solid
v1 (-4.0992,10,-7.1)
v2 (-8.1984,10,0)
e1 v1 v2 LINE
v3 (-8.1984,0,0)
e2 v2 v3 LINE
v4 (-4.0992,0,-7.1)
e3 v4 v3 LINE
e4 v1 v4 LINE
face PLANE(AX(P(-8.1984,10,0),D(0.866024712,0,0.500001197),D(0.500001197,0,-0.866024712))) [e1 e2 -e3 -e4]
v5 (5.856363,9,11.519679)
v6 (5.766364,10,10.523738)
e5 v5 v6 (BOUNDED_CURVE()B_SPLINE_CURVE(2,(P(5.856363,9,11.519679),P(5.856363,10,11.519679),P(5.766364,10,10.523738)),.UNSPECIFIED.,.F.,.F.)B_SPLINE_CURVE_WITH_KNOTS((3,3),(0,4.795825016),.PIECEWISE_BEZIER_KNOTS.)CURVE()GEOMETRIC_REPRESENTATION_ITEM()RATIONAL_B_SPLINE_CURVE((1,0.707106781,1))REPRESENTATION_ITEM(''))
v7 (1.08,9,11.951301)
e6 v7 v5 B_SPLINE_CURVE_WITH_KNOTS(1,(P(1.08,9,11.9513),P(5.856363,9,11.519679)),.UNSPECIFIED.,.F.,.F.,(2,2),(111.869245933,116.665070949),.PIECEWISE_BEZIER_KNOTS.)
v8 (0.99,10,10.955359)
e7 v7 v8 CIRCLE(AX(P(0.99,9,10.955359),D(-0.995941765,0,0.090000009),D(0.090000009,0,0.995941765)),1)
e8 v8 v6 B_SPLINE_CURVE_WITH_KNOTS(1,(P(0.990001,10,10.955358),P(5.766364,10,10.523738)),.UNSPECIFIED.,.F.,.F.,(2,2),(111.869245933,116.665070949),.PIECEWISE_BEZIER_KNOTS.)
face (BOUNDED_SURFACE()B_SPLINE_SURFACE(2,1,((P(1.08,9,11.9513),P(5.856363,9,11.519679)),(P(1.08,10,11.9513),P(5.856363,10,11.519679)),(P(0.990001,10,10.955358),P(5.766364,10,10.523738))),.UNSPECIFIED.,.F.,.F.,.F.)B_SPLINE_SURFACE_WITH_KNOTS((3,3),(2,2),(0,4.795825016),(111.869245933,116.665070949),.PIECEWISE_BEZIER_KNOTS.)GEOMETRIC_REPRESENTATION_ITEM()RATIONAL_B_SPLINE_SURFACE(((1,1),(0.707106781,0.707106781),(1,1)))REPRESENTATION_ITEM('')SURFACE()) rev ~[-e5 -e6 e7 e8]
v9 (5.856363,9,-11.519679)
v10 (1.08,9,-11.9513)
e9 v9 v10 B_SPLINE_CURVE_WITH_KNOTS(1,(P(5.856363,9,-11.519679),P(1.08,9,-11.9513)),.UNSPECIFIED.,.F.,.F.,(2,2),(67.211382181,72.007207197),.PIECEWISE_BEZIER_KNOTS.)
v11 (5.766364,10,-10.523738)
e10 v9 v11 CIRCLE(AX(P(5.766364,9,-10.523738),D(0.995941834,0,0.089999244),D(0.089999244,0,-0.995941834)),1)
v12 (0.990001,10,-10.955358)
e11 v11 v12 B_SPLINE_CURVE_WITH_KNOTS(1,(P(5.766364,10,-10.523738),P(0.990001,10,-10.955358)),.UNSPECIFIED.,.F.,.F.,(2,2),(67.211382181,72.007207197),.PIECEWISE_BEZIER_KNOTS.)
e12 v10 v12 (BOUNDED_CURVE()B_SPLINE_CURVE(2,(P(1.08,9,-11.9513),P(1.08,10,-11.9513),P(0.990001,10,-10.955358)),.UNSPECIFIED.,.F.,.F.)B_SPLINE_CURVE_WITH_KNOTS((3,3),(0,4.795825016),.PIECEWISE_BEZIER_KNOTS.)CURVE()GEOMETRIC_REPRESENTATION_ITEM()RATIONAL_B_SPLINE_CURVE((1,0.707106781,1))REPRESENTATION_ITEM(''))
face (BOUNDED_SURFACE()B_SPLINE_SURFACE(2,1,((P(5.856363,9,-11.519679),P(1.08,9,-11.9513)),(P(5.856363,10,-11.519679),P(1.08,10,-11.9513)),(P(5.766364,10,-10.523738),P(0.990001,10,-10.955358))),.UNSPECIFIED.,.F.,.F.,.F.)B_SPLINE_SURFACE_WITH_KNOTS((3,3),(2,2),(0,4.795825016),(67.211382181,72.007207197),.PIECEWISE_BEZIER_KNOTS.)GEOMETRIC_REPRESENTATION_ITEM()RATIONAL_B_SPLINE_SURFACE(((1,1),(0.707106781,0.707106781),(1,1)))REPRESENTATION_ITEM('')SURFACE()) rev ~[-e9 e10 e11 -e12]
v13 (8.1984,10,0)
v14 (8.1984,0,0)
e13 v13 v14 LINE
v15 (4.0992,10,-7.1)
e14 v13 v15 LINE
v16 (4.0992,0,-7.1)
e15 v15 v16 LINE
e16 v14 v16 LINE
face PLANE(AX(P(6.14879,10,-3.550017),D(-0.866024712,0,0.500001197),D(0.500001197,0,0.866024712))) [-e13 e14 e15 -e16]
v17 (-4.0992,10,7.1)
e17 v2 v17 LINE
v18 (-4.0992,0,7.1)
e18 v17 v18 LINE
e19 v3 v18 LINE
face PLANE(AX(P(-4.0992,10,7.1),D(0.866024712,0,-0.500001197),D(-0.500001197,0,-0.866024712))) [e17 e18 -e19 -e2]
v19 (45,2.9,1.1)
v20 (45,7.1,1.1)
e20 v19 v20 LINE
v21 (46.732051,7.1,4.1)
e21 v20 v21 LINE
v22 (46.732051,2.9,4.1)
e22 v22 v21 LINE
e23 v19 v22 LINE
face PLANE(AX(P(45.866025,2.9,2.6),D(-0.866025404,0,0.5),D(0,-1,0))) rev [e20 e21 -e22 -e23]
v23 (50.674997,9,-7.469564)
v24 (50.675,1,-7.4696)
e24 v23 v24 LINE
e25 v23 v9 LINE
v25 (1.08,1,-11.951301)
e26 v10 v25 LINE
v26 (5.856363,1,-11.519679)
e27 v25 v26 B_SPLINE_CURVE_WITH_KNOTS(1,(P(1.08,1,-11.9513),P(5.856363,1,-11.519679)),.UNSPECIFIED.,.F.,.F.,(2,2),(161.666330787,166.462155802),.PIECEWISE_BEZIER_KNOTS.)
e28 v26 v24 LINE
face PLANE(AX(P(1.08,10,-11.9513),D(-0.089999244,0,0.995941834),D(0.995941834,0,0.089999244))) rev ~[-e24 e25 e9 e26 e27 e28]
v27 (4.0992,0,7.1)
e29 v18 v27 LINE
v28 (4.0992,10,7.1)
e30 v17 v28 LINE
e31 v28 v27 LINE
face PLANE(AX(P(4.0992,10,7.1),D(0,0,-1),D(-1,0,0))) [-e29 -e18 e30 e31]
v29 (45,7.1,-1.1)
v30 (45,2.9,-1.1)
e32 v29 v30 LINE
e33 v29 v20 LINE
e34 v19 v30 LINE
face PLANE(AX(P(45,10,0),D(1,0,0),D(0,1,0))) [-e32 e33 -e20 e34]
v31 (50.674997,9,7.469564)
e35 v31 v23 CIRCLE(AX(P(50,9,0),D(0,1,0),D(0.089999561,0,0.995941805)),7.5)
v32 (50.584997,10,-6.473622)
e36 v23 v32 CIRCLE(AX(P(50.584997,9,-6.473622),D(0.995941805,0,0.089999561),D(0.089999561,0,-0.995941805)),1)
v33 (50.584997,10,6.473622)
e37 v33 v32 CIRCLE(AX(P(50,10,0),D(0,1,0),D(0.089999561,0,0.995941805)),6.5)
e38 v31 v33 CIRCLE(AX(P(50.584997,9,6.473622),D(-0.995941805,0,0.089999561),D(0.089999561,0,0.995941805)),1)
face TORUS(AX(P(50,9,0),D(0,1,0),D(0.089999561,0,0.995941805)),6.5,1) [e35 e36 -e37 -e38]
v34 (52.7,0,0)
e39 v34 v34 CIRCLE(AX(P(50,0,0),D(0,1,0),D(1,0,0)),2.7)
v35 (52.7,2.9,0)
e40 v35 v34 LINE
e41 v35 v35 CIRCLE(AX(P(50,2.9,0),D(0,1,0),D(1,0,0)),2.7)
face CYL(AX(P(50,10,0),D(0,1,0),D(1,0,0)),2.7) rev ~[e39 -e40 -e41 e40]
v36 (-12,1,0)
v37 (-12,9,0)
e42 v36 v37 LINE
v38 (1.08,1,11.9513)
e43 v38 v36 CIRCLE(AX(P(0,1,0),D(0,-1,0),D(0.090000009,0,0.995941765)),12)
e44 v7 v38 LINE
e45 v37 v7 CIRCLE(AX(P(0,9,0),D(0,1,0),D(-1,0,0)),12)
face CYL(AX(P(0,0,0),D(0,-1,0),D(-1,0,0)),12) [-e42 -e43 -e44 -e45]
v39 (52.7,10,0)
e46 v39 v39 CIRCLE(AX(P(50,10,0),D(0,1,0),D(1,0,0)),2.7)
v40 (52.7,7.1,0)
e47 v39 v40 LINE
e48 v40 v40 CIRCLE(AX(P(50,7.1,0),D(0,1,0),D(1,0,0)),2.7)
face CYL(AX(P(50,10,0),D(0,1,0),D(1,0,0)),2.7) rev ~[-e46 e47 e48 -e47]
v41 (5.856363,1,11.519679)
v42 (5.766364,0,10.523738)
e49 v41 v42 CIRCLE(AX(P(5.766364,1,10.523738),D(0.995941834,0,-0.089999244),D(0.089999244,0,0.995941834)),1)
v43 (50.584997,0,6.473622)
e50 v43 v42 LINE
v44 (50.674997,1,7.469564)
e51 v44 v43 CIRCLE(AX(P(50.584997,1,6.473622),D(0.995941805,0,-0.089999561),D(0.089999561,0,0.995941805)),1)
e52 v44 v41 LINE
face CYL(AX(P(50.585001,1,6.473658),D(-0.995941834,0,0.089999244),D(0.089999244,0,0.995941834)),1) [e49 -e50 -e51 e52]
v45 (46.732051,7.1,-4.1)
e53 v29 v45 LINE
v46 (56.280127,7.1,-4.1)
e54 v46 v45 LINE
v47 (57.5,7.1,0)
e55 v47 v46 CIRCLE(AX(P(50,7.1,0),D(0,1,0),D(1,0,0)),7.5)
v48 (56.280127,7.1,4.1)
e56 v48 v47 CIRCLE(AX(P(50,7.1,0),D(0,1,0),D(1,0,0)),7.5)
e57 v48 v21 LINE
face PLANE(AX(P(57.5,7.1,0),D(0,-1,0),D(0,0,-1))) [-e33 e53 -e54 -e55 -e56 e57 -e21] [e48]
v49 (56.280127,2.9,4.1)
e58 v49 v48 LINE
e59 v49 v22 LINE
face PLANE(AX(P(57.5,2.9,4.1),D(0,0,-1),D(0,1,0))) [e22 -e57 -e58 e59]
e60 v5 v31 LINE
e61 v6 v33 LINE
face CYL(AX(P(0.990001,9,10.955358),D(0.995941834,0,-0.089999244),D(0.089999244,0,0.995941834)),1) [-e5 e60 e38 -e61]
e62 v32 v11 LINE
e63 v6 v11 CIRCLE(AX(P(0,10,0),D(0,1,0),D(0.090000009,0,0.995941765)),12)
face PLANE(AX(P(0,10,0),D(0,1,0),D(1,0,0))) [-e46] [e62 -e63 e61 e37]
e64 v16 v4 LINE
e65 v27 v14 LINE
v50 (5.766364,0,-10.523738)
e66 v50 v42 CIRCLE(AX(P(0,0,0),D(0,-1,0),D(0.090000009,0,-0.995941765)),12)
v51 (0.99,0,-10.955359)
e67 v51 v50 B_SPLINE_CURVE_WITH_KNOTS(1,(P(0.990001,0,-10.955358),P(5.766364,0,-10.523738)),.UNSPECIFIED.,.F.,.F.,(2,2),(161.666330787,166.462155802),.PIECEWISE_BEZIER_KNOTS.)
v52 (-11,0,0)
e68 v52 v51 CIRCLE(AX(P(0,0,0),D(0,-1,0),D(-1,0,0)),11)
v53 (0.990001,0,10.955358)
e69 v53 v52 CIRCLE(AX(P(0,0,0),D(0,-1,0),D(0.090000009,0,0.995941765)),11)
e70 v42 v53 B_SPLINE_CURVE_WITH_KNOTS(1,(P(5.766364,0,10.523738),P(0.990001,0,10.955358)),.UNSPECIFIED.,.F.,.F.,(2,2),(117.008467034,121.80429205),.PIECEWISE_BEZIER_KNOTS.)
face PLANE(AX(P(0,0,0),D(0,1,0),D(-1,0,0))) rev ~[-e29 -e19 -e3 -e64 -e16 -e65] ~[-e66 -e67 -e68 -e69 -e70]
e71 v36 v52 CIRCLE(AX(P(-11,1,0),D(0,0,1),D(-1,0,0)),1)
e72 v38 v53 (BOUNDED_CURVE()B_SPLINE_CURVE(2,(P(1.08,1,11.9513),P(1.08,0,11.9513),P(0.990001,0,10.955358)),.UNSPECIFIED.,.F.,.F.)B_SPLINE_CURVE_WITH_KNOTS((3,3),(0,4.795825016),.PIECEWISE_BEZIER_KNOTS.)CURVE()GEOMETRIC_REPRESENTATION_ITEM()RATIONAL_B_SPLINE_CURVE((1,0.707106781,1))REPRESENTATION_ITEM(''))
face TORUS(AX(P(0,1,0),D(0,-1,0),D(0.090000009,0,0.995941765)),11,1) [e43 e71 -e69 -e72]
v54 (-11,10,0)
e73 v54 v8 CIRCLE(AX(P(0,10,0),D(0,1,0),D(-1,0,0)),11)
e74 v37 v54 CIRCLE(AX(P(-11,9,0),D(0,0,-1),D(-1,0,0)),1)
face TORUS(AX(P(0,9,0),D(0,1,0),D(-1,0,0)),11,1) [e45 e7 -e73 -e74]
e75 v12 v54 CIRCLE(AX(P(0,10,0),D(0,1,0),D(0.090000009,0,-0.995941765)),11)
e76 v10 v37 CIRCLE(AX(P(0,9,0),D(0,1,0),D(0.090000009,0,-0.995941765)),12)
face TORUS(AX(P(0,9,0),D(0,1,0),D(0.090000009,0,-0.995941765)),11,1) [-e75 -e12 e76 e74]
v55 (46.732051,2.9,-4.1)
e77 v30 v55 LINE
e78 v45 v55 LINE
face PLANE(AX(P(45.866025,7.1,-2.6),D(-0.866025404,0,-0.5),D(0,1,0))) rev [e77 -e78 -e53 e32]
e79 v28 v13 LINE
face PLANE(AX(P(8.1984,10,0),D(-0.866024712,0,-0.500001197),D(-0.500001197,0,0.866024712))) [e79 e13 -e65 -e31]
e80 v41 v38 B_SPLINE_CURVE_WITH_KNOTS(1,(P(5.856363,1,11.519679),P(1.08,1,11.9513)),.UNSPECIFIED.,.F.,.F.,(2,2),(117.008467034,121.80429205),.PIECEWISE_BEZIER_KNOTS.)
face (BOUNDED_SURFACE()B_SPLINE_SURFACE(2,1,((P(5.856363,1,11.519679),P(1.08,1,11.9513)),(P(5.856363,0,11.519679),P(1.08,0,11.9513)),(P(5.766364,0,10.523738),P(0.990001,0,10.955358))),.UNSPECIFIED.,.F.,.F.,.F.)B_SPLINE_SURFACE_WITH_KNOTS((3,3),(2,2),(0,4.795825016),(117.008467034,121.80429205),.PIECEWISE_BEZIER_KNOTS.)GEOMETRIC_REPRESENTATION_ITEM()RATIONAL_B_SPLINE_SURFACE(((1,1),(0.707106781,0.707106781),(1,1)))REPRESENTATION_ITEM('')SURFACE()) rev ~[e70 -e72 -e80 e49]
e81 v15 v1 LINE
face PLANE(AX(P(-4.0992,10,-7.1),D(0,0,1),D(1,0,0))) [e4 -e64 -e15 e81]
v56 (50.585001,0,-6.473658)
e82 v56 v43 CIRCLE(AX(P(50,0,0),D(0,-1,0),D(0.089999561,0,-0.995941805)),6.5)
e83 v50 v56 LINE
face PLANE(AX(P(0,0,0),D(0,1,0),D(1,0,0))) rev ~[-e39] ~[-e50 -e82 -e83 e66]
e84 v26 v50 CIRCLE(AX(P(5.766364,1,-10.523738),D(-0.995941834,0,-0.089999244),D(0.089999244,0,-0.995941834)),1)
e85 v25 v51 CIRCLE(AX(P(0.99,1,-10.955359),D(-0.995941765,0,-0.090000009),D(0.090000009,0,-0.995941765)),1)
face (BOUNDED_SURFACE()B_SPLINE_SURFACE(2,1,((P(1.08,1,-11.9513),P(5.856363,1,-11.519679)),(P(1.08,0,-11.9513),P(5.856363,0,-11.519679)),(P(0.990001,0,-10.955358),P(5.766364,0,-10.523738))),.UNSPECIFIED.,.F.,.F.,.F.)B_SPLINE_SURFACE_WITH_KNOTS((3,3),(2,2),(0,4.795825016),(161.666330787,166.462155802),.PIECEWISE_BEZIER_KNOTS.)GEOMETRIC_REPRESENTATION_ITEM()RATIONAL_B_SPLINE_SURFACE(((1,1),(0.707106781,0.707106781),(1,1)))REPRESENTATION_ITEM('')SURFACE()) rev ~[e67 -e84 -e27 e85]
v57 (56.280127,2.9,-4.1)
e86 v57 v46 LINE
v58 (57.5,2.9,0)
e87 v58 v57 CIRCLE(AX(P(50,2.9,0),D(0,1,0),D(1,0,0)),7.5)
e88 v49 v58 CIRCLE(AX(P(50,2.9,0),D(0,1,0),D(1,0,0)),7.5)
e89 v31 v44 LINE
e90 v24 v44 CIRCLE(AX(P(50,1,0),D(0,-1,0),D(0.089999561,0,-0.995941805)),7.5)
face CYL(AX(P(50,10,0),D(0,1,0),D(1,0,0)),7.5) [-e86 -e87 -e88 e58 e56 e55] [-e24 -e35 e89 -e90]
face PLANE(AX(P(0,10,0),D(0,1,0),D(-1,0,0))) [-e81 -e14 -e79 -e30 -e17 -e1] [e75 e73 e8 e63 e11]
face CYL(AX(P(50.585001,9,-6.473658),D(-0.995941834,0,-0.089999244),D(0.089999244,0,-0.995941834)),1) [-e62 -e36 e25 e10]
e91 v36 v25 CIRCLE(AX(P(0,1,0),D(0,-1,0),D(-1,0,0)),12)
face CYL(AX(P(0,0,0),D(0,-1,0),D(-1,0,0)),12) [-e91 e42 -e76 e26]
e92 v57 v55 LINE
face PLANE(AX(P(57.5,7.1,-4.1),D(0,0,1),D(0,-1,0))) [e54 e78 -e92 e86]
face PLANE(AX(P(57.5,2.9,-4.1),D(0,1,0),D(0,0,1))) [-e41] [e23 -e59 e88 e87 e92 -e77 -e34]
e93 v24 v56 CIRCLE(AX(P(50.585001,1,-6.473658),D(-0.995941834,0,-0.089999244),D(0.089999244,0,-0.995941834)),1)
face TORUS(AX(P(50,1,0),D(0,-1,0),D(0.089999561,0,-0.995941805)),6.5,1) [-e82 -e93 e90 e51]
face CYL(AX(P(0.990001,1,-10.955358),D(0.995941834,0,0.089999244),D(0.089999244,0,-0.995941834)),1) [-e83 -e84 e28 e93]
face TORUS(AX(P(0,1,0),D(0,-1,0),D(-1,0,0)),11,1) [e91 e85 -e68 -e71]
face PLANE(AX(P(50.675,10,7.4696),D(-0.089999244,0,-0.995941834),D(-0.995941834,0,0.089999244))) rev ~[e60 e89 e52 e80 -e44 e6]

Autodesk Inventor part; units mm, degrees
ref_plane "XZ Plane" through (0, 0, 0) normal (0, 1, 0) x (-1, 0, 0)
ref_plane "XY Plane" through (0, 0, 0) normal (0, 0, 1) x (1, 0, 0)
sketch "Sketch1" plane through (0, 0, 0) normal (0, 1, 0) x (-1, 0, 0)
  circle A0 centre (0, 0) radius 4
  circle A1 centre (0, 0) radius 12
  dimension "d0" = 8
  dimension "d1" = 24
extrude "Extrusion1" add sketch "Sketch1" along normal blind 10
sketch "Sketch2" plane through (0, 10, 0) normal (0, 1, 0) x (1, 0, 0)
  circle A0 centre (0, 0) radius 12 projected
  line L0 (1.08, 11.9513) -> (50.675, 7.4696)
  circle A1 centre (50, 0) radius 7.5
  line L1 (50.675, -7.4696) -> (1.08, -11.9513)
  circle A2 centre (50, 0) radius 2.7
  circle A3 centre (0, 0) radius 12 projected
  point P0 (3.9985, -10.2475)
  point P1 (1.1339, 10.9414)
  dimension "d4" = 50
  dimension "d5" = 15
  dimension "d6" = 5.4
extrude "Extrusion2" add sketch "Sketch2" against normal up to surface (10 mm away) contours A0 L0 A1 L1 | A1
sketch "Sketch3" plane through (0, 10, 0) normal (0, 1, 0) x (1, 0, 0)
  circle A0 centre (0, 0) radius 7.1
  line L0 (8.1984, 0) -> (4.0992, -7.1)
  line L1 (4.0992, -7.1) -> (-4.0992, -7.1)
  line L2 (-4.0992, -7.1) -> (-8.1984, 0)
  line L3 (-8.1984, 0) -> (-4.0992, 7.1)
  line L4 (-4.0992, 7.1) -> (4.0992, 7.1)
  line L5 (4.0992, 7.1) -> (8.1984, 0)
  dimension "d9" = 14.2
extrude "Extrusion3" cut sketch "Sketch3" against normal blind 10
ref_plane "Work Plane1" through (57.5, 10, 0) normal (1, 0, 0) x (0, 1, 0)
sketch "Sketch4" plane through (57.5, 10, 0) normal (1, 0, 0) x (0, 1, 0)
  line L0 (-2.9, -4.1) -> (-7.1, -4.1)
  line L1 (-7.1, -4.1) -> (-7.1, 4.1)
  line L2 (-7.1, 4.1) -> (-2.9, 4.1)
  line L3 (-2.9, 4.1) -> (-2.9, -4.1)
  line L4 (0, 0) -> (-10, 0) projected
  line L5 (-2.9, -4.1) -> (-7.1, 4.1) construction
  line L6 (-7.1, -4.1) -> (-2.9, 4.1) construction
  point P0 (-5, 0)
  dimension "d12" = 4.2
  dimension "d13" = 8.2
extrude "Extrusion4" cut sketch "Sketch4" against normal blind 12.5
chamfer "Chamfer1" distance 3 angle 30 2 edges at (45, 5, -4.1) (45, 5, 4.1) measured on face at (45, 4.3, -1.3667)
fillet "Fillet1" radius 1 8 edges at (-12, 0, 0) (25.8775, 0, -9.7104) (57.5, 0, 0) (25.8775, 0, 9.7104) (57.5, 10, 0) (25.8775, 10, -9.7104) (-12, 10, 0) (25.8775, 10, 9.7104)
properties part number "Crank"
